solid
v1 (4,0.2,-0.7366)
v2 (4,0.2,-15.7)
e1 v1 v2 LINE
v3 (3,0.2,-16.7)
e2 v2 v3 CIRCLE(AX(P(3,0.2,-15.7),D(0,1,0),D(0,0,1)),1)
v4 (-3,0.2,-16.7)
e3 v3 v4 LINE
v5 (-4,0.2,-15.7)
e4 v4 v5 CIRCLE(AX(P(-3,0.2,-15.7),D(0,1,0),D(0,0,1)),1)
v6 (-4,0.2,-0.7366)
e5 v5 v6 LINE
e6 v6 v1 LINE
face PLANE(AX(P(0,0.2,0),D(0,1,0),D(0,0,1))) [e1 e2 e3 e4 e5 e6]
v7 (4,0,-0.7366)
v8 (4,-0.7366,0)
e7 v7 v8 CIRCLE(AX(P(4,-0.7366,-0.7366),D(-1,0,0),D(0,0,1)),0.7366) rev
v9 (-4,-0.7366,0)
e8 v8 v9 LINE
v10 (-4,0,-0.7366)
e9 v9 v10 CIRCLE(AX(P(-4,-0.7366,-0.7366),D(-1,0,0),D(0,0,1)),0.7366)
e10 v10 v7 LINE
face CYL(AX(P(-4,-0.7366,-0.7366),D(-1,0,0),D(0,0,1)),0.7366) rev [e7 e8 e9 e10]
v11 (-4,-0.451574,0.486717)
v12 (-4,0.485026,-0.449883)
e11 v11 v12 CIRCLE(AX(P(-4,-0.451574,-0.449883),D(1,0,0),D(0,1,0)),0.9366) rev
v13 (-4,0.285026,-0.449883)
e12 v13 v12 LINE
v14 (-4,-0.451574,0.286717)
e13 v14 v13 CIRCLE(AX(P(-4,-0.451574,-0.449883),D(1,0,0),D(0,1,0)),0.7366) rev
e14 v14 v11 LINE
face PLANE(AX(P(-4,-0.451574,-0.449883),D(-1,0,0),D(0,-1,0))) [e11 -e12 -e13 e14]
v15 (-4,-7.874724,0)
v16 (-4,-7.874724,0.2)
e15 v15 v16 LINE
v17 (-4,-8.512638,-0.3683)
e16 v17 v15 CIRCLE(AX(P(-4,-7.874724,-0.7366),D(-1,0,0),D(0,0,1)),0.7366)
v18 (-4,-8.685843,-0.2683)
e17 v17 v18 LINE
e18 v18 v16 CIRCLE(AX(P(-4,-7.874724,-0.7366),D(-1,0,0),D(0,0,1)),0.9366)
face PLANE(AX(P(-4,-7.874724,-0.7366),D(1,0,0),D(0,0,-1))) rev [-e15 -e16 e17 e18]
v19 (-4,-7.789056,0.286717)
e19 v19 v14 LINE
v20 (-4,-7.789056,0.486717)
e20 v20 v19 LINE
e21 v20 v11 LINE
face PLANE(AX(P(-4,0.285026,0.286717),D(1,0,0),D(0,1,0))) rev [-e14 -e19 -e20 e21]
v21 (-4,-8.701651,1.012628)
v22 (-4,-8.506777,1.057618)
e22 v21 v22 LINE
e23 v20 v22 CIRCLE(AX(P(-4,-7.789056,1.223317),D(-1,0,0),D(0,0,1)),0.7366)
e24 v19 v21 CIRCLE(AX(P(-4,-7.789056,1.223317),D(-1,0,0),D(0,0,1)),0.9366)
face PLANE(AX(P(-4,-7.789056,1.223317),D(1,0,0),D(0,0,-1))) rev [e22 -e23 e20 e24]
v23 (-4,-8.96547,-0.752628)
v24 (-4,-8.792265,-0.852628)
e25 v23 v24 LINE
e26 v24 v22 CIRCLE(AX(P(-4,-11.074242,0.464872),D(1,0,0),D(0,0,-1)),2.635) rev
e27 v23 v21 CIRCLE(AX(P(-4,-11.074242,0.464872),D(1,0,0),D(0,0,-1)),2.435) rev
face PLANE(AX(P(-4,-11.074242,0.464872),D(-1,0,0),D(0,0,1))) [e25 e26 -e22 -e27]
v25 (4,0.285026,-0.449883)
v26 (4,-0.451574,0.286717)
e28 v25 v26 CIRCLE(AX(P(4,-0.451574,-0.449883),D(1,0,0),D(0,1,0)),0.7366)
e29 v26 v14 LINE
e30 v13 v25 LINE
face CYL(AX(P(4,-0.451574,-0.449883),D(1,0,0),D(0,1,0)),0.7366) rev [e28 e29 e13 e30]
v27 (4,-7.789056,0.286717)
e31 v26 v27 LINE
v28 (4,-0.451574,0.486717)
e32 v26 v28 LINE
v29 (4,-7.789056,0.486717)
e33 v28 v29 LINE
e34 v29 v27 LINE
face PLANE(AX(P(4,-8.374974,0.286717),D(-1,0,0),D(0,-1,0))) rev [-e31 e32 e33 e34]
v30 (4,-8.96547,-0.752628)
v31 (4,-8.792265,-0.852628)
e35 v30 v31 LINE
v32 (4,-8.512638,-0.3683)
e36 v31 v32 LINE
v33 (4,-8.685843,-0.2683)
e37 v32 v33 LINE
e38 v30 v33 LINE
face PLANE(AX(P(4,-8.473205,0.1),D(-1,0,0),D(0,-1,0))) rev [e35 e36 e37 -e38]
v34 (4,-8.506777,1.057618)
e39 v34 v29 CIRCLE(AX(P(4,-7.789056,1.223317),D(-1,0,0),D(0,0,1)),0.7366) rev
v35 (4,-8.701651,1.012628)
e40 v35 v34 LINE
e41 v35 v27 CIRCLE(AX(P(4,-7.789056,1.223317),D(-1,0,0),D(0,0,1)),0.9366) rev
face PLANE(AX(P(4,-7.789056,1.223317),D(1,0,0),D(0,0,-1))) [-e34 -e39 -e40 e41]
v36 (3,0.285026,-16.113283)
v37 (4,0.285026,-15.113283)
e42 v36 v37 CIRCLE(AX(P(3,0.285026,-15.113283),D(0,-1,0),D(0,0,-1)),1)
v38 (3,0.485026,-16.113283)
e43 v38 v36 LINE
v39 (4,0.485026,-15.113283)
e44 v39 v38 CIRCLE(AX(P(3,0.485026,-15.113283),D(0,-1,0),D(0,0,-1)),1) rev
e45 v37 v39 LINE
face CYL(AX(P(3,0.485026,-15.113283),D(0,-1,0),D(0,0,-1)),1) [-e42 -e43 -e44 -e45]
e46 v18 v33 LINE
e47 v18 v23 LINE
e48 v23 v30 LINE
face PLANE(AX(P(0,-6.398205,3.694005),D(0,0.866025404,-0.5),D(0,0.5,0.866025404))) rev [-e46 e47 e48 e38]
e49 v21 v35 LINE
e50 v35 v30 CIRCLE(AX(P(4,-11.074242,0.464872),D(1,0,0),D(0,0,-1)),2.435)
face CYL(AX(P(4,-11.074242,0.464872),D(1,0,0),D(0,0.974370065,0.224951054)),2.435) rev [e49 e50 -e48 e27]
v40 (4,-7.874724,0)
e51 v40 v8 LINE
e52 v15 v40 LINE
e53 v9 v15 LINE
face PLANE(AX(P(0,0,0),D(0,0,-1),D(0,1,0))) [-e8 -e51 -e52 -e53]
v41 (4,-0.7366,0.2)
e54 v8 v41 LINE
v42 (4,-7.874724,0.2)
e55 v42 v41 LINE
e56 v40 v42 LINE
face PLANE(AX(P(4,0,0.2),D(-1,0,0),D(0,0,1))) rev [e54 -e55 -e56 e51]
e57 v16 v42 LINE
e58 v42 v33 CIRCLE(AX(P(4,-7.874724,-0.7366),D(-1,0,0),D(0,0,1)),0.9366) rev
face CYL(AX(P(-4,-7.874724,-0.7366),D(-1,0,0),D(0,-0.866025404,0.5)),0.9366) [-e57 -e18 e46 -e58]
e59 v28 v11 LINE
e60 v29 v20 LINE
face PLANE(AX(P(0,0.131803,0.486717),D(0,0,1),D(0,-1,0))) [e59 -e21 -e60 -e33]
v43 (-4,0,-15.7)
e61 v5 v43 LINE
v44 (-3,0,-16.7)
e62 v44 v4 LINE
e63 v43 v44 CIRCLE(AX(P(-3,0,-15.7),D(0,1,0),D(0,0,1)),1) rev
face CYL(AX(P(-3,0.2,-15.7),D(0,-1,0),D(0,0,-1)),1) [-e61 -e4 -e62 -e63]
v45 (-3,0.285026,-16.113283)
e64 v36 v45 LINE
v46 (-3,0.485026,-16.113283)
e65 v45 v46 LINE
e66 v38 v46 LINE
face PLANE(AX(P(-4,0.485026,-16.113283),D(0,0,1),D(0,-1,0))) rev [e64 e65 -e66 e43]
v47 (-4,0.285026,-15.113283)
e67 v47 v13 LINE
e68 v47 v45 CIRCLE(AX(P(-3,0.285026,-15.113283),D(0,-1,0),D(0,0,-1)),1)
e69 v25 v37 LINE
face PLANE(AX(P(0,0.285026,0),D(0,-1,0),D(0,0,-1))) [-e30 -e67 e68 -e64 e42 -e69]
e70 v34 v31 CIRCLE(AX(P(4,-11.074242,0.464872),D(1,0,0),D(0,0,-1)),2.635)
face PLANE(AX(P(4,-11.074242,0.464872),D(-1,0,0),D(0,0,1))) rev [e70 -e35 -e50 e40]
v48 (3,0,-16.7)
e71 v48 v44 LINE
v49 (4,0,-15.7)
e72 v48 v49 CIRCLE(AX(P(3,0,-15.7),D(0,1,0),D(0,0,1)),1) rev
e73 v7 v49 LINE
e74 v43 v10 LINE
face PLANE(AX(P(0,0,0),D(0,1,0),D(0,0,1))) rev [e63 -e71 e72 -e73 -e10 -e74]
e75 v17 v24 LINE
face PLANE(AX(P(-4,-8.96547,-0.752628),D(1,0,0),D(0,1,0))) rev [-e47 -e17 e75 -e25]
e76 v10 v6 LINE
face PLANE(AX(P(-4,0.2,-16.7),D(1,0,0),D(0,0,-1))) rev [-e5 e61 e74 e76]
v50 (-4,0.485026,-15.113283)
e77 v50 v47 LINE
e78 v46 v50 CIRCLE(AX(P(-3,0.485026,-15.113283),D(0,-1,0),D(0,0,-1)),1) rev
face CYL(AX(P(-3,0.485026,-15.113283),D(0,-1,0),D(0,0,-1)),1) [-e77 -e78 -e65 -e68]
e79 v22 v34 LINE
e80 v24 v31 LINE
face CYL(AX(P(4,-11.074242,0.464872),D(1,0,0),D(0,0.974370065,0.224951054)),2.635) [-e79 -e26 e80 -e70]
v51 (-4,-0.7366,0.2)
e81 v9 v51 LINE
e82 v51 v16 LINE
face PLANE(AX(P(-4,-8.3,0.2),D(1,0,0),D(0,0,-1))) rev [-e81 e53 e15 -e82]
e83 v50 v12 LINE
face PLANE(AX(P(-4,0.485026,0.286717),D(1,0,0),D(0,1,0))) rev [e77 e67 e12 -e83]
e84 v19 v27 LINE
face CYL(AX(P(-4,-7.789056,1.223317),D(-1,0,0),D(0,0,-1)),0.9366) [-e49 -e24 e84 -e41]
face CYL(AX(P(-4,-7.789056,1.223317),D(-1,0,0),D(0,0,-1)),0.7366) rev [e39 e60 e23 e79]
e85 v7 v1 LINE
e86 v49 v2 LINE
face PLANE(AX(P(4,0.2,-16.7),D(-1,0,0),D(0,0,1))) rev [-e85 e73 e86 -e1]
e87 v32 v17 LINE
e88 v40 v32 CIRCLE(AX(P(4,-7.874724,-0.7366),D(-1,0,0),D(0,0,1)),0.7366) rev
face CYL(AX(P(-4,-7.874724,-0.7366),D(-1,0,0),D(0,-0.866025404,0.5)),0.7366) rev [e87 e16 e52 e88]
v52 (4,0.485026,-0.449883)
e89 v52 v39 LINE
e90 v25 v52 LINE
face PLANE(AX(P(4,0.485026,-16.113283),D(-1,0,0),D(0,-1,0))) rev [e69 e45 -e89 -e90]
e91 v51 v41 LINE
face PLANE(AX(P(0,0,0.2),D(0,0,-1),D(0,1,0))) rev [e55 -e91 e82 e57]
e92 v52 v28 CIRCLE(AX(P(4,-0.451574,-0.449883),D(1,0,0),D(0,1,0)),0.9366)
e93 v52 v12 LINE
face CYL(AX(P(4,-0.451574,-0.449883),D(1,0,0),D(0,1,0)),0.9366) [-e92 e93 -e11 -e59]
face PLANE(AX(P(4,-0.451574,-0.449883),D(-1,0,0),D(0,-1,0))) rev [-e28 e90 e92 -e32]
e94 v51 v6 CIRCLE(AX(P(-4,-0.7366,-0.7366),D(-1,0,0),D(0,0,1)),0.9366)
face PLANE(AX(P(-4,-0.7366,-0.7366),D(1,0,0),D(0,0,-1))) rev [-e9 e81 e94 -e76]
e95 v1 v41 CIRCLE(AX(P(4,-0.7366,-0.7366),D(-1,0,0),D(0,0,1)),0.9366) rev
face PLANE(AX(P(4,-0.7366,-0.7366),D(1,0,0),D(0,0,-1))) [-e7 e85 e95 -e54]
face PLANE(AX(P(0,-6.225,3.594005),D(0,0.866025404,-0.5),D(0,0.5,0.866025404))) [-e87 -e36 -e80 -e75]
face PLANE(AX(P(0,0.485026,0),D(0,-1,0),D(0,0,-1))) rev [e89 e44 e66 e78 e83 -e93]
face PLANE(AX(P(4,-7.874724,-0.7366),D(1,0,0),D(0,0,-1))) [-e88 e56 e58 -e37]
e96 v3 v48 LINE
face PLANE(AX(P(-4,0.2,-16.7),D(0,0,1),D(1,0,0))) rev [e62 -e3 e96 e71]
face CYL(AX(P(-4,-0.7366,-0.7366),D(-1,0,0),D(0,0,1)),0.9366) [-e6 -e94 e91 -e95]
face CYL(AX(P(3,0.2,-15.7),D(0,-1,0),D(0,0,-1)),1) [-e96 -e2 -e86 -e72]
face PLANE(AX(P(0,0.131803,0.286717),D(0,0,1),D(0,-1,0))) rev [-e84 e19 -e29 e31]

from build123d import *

# Parameters (mm, degrees)
SKETCH1_W                    = 8
SKETCH1_H                    = 16.7
BASE_FLANGE1_DEPTH           = 0.2
EDGE_FLANGE2_STRIP_W         = 2.2732
EDGE_FLANGE2_STRIP_H         = 0.2
EDGE_FLANGE2_STRIP_CUT_DEPTH = 8
EDGE_FLANGE2_DEPTH           = 8
EDGE_FLANGE3_STRIP_CUT_DEPTH = 8
EDGE_FLANGE3_DEPTH           = 8
HEM1_START                   = -4
HEM1_DEPTH                   = 8
EDGE_FLANGE4_START           = -4
EDGE_FLANGE4_DEPTH           = 8
EDGE_FLANGE5_STRIP_W         = 2.2732
EDGE_FLANGE5_STRIP_H         = 0.2
EDGE_FLANGE5_STRIP_CUT_DEPTH = 8
EDGE_FLANGE5_DEPTH           = 8
FILLET1_R                    = 1


# Read off the part's stored shape, not the designer's step: Hem1, Edge-Flange4
# Sheet-metal steps are written as plain solids
with BuildPart() as part:
    # Sketch1 → Base-Flange1 (new body)
    with BuildSketch(Plane(origin=(0, 0, 0), x_dir=(1, 0, 0), z_dir=(0, 1, 0))):
        with Locations((0, 8.35)):
            Rectangle(SKETCH1_W, SKETCH1_H)
    extrude(amount=BASE_FLANGE1_DEPTH)

    # Edge-Flange2 strip (across the edge) → Edge-Flange2 strip cut (cut)
    with BuildSketch(Plane(origin=(4, 0, 0), x_dir=(0, 0, -1), z_dir=(-1, 0, 0))):
        with Locations((-0.4, -0.1)):
            Rectangle(EDGE_FLANGE2_STRIP_W, EDGE_FLANGE2_STRIP_H)
    extrude(amount=EDGE_FLANGE2_STRIP_CUT_DEPTH, mode=Mode.SUBTRACT)

    # Edge-Flange2 section (across the edge) → Edge-Flange2 (add)
    with BuildSketch(Plane(origin=(4, 0, 0), x_dir=(0, 0, -1), z_dir=(-1, 0, 0))):
        with BuildLine():
            Line((-0.2, 0.7366), (-0.2, 8.3))
            Line((-0.2, 8.3), (0, 8.3))
            Line((0, 8.3), (0, 0.7366))
            ThreePointArc((0, 0.7366), (0.215745145, 0.215745145), (0.7366, 0))
            Line((0.7366, 0), (0.7366, -0.2))
            ThreePointArc((0.7366, -0.2), (0.074323789, 0.074323789), (-0.2, 0.7366))
        make_face()
    extrude(amount=EDGE_FLANGE2_DEPTH)

    # Edge-Flange3 strip (across the edge) → Edge-Flange3 strip cut (cut)
    with BuildSketch(Plane(origin=(4, -8.3, 0), x_dir=(0, 0.8660254037844346, -0.5000000000000071), z_dir=(-1, 0, 0))):
        Polygon((-1.700348948, 0.750756815), (0.2683, -0.385843185), (0.3683, -0.212638104), (-1.600348948, 0.923961896), align=None)
    extrude(amount=EDGE_FLANGE3_STRIP_CUT_DEPTH, mode=Mode.SUBTRACT)

    # Edge-Flange3 section (across the edge) → Edge-Flange3 (add)
    with BuildSketch(Plane(origin=(4, -8.3, 0), x_dir=(0, 0.8660254037844346, -0.5000000000000071), z_dir=(-1, 0, 0))):
        with BuildLine():
            Line((-0.2, 0.425276208), (-0.2, 0.984529946))
            Line((-0.2, 0.984529946), (0, 0.984529946))
            Line((0, 0.984529946), (0, 0.425276208))
            ThreePointArc((0, 0.425276208), (0.098685688, 0.056976208), (0.3683, -0.212638104))
            Line((0.3683, -0.212638104), (0.2683, -0.385843185))
            ThreePointArc((0.2683, -0.385843185), (-0.074519393, -0.043023792), (-0.2, 0.425276208))
        make_face()
    extrude(amount=EDGE_FLANGE3_DEPTH)

    # Hem1 outline → Hem1 (add)
    with BuildSketch(Plane.YZ.offset(HEM1_START)):
        with BuildLine():
            Line((-8.701650804, 1.012627873), (-8.506776791, 1.057618084))
            ThreePointArc((-8.506776791, 1.057618084), (-13.680298712, 0.854349855), (-8.792264973, -0.852627944))
            Line((-8.792264973, -0.852627944), (-8.965470054, -0.752627944))
            ThreePointArc((-8.965470054, -0.752627944), (-13.482495539, 0.824787973), (-8.701650804, 1.012627873))
        make_face()
    extrude(amount=HEM1_DEPTH)

    # Edge-Flange4 outline → Edge-Flange4 (add)
    with BuildSketch(Plane.YZ.offset(EDGE_FLANGE4_START)):
        with BuildLine():
            ThreePointArc((-8.701650804, 1.012627873), (-8.37210301, 0.490326231), (-7.789055802, 0.286717031))
            Line((-7.789055802, 0.286717031), (0.285026102, 0.286717031))
            Line((0.285026102, 0.286717031), (0.285026102, 0.486717031))
            Line((0.285026102, 0.486717031), (-7.789055802, 0.486717031))
            ThreePointArc((-7.789055802, 0.486717031), (-8.247600083, 0.646847862), (-8.506776791, 1.057618084))
            Line((-8.506776791, 1.057618084), (-8.701650804, 1.012627873))
        make_face()
    extrude(amount=EDGE_FLANGE4_DEPTH)

    # Edge-Flange5 strip (across the edge) → Edge-Flange5 strip cut (cut)
    with BuildSketch(Plane(origin=(-4, 0.285026102, 0.286717031), x_dir=(0, -1, 0), z_dir=(1, 0, 0))):
        with Locations((-0.4, -0.1)):
            Rectangle(EDGE_FLANGE5_STRIP_W, EDGE_FLANGE5_STRIP_H)
    extrude(amount=EDGE_FLANGE5_STRIP_CUT_DEPTH, mode=Mode.SUBTRACT)

    # Edge-Flange5 section (across the edge) → Edge-Flange5 (add)
    with BuildSketch(Plane(origin=(-4, 0.285026102, 0.286717031), x_dir=(0, -1, 0), z_dir=(1, 0, 0))):
        with BuildLine():
            Line((-0.2, 0.7366), (-0.2, 16.4))
            Line((-0.2, 16.4), (0, 16.4))
            Line((0, 16.4), (0, 0.7366))
            ThreePointArc((0, 0.7366), (0.215745145, 0.215745145), (0.7366, 0))
            Line((0.7366, 0), (0.7366, -0.2))
            ThreePointArc((0.7366, -0.2), (0.074323789, 0.074323789), (-0.2, 0.7366))
        make_face()
    extrude(amount=EDGE_FLANGE5_DEPTH)

    # Fillet1
    fillet1_edges = [part.edges().sort_by_distance(p)[0] for p in [
        (-4, 0.385026102, -16.113282969),
        (4, 0.385026102, -16.113282969),
        (-4, 0.1, -16.7),
        (4, 0.1, -16.7),
    ]]
    fillet(fillet1_edges, radius=FILLET1_R)


solid = part.part
